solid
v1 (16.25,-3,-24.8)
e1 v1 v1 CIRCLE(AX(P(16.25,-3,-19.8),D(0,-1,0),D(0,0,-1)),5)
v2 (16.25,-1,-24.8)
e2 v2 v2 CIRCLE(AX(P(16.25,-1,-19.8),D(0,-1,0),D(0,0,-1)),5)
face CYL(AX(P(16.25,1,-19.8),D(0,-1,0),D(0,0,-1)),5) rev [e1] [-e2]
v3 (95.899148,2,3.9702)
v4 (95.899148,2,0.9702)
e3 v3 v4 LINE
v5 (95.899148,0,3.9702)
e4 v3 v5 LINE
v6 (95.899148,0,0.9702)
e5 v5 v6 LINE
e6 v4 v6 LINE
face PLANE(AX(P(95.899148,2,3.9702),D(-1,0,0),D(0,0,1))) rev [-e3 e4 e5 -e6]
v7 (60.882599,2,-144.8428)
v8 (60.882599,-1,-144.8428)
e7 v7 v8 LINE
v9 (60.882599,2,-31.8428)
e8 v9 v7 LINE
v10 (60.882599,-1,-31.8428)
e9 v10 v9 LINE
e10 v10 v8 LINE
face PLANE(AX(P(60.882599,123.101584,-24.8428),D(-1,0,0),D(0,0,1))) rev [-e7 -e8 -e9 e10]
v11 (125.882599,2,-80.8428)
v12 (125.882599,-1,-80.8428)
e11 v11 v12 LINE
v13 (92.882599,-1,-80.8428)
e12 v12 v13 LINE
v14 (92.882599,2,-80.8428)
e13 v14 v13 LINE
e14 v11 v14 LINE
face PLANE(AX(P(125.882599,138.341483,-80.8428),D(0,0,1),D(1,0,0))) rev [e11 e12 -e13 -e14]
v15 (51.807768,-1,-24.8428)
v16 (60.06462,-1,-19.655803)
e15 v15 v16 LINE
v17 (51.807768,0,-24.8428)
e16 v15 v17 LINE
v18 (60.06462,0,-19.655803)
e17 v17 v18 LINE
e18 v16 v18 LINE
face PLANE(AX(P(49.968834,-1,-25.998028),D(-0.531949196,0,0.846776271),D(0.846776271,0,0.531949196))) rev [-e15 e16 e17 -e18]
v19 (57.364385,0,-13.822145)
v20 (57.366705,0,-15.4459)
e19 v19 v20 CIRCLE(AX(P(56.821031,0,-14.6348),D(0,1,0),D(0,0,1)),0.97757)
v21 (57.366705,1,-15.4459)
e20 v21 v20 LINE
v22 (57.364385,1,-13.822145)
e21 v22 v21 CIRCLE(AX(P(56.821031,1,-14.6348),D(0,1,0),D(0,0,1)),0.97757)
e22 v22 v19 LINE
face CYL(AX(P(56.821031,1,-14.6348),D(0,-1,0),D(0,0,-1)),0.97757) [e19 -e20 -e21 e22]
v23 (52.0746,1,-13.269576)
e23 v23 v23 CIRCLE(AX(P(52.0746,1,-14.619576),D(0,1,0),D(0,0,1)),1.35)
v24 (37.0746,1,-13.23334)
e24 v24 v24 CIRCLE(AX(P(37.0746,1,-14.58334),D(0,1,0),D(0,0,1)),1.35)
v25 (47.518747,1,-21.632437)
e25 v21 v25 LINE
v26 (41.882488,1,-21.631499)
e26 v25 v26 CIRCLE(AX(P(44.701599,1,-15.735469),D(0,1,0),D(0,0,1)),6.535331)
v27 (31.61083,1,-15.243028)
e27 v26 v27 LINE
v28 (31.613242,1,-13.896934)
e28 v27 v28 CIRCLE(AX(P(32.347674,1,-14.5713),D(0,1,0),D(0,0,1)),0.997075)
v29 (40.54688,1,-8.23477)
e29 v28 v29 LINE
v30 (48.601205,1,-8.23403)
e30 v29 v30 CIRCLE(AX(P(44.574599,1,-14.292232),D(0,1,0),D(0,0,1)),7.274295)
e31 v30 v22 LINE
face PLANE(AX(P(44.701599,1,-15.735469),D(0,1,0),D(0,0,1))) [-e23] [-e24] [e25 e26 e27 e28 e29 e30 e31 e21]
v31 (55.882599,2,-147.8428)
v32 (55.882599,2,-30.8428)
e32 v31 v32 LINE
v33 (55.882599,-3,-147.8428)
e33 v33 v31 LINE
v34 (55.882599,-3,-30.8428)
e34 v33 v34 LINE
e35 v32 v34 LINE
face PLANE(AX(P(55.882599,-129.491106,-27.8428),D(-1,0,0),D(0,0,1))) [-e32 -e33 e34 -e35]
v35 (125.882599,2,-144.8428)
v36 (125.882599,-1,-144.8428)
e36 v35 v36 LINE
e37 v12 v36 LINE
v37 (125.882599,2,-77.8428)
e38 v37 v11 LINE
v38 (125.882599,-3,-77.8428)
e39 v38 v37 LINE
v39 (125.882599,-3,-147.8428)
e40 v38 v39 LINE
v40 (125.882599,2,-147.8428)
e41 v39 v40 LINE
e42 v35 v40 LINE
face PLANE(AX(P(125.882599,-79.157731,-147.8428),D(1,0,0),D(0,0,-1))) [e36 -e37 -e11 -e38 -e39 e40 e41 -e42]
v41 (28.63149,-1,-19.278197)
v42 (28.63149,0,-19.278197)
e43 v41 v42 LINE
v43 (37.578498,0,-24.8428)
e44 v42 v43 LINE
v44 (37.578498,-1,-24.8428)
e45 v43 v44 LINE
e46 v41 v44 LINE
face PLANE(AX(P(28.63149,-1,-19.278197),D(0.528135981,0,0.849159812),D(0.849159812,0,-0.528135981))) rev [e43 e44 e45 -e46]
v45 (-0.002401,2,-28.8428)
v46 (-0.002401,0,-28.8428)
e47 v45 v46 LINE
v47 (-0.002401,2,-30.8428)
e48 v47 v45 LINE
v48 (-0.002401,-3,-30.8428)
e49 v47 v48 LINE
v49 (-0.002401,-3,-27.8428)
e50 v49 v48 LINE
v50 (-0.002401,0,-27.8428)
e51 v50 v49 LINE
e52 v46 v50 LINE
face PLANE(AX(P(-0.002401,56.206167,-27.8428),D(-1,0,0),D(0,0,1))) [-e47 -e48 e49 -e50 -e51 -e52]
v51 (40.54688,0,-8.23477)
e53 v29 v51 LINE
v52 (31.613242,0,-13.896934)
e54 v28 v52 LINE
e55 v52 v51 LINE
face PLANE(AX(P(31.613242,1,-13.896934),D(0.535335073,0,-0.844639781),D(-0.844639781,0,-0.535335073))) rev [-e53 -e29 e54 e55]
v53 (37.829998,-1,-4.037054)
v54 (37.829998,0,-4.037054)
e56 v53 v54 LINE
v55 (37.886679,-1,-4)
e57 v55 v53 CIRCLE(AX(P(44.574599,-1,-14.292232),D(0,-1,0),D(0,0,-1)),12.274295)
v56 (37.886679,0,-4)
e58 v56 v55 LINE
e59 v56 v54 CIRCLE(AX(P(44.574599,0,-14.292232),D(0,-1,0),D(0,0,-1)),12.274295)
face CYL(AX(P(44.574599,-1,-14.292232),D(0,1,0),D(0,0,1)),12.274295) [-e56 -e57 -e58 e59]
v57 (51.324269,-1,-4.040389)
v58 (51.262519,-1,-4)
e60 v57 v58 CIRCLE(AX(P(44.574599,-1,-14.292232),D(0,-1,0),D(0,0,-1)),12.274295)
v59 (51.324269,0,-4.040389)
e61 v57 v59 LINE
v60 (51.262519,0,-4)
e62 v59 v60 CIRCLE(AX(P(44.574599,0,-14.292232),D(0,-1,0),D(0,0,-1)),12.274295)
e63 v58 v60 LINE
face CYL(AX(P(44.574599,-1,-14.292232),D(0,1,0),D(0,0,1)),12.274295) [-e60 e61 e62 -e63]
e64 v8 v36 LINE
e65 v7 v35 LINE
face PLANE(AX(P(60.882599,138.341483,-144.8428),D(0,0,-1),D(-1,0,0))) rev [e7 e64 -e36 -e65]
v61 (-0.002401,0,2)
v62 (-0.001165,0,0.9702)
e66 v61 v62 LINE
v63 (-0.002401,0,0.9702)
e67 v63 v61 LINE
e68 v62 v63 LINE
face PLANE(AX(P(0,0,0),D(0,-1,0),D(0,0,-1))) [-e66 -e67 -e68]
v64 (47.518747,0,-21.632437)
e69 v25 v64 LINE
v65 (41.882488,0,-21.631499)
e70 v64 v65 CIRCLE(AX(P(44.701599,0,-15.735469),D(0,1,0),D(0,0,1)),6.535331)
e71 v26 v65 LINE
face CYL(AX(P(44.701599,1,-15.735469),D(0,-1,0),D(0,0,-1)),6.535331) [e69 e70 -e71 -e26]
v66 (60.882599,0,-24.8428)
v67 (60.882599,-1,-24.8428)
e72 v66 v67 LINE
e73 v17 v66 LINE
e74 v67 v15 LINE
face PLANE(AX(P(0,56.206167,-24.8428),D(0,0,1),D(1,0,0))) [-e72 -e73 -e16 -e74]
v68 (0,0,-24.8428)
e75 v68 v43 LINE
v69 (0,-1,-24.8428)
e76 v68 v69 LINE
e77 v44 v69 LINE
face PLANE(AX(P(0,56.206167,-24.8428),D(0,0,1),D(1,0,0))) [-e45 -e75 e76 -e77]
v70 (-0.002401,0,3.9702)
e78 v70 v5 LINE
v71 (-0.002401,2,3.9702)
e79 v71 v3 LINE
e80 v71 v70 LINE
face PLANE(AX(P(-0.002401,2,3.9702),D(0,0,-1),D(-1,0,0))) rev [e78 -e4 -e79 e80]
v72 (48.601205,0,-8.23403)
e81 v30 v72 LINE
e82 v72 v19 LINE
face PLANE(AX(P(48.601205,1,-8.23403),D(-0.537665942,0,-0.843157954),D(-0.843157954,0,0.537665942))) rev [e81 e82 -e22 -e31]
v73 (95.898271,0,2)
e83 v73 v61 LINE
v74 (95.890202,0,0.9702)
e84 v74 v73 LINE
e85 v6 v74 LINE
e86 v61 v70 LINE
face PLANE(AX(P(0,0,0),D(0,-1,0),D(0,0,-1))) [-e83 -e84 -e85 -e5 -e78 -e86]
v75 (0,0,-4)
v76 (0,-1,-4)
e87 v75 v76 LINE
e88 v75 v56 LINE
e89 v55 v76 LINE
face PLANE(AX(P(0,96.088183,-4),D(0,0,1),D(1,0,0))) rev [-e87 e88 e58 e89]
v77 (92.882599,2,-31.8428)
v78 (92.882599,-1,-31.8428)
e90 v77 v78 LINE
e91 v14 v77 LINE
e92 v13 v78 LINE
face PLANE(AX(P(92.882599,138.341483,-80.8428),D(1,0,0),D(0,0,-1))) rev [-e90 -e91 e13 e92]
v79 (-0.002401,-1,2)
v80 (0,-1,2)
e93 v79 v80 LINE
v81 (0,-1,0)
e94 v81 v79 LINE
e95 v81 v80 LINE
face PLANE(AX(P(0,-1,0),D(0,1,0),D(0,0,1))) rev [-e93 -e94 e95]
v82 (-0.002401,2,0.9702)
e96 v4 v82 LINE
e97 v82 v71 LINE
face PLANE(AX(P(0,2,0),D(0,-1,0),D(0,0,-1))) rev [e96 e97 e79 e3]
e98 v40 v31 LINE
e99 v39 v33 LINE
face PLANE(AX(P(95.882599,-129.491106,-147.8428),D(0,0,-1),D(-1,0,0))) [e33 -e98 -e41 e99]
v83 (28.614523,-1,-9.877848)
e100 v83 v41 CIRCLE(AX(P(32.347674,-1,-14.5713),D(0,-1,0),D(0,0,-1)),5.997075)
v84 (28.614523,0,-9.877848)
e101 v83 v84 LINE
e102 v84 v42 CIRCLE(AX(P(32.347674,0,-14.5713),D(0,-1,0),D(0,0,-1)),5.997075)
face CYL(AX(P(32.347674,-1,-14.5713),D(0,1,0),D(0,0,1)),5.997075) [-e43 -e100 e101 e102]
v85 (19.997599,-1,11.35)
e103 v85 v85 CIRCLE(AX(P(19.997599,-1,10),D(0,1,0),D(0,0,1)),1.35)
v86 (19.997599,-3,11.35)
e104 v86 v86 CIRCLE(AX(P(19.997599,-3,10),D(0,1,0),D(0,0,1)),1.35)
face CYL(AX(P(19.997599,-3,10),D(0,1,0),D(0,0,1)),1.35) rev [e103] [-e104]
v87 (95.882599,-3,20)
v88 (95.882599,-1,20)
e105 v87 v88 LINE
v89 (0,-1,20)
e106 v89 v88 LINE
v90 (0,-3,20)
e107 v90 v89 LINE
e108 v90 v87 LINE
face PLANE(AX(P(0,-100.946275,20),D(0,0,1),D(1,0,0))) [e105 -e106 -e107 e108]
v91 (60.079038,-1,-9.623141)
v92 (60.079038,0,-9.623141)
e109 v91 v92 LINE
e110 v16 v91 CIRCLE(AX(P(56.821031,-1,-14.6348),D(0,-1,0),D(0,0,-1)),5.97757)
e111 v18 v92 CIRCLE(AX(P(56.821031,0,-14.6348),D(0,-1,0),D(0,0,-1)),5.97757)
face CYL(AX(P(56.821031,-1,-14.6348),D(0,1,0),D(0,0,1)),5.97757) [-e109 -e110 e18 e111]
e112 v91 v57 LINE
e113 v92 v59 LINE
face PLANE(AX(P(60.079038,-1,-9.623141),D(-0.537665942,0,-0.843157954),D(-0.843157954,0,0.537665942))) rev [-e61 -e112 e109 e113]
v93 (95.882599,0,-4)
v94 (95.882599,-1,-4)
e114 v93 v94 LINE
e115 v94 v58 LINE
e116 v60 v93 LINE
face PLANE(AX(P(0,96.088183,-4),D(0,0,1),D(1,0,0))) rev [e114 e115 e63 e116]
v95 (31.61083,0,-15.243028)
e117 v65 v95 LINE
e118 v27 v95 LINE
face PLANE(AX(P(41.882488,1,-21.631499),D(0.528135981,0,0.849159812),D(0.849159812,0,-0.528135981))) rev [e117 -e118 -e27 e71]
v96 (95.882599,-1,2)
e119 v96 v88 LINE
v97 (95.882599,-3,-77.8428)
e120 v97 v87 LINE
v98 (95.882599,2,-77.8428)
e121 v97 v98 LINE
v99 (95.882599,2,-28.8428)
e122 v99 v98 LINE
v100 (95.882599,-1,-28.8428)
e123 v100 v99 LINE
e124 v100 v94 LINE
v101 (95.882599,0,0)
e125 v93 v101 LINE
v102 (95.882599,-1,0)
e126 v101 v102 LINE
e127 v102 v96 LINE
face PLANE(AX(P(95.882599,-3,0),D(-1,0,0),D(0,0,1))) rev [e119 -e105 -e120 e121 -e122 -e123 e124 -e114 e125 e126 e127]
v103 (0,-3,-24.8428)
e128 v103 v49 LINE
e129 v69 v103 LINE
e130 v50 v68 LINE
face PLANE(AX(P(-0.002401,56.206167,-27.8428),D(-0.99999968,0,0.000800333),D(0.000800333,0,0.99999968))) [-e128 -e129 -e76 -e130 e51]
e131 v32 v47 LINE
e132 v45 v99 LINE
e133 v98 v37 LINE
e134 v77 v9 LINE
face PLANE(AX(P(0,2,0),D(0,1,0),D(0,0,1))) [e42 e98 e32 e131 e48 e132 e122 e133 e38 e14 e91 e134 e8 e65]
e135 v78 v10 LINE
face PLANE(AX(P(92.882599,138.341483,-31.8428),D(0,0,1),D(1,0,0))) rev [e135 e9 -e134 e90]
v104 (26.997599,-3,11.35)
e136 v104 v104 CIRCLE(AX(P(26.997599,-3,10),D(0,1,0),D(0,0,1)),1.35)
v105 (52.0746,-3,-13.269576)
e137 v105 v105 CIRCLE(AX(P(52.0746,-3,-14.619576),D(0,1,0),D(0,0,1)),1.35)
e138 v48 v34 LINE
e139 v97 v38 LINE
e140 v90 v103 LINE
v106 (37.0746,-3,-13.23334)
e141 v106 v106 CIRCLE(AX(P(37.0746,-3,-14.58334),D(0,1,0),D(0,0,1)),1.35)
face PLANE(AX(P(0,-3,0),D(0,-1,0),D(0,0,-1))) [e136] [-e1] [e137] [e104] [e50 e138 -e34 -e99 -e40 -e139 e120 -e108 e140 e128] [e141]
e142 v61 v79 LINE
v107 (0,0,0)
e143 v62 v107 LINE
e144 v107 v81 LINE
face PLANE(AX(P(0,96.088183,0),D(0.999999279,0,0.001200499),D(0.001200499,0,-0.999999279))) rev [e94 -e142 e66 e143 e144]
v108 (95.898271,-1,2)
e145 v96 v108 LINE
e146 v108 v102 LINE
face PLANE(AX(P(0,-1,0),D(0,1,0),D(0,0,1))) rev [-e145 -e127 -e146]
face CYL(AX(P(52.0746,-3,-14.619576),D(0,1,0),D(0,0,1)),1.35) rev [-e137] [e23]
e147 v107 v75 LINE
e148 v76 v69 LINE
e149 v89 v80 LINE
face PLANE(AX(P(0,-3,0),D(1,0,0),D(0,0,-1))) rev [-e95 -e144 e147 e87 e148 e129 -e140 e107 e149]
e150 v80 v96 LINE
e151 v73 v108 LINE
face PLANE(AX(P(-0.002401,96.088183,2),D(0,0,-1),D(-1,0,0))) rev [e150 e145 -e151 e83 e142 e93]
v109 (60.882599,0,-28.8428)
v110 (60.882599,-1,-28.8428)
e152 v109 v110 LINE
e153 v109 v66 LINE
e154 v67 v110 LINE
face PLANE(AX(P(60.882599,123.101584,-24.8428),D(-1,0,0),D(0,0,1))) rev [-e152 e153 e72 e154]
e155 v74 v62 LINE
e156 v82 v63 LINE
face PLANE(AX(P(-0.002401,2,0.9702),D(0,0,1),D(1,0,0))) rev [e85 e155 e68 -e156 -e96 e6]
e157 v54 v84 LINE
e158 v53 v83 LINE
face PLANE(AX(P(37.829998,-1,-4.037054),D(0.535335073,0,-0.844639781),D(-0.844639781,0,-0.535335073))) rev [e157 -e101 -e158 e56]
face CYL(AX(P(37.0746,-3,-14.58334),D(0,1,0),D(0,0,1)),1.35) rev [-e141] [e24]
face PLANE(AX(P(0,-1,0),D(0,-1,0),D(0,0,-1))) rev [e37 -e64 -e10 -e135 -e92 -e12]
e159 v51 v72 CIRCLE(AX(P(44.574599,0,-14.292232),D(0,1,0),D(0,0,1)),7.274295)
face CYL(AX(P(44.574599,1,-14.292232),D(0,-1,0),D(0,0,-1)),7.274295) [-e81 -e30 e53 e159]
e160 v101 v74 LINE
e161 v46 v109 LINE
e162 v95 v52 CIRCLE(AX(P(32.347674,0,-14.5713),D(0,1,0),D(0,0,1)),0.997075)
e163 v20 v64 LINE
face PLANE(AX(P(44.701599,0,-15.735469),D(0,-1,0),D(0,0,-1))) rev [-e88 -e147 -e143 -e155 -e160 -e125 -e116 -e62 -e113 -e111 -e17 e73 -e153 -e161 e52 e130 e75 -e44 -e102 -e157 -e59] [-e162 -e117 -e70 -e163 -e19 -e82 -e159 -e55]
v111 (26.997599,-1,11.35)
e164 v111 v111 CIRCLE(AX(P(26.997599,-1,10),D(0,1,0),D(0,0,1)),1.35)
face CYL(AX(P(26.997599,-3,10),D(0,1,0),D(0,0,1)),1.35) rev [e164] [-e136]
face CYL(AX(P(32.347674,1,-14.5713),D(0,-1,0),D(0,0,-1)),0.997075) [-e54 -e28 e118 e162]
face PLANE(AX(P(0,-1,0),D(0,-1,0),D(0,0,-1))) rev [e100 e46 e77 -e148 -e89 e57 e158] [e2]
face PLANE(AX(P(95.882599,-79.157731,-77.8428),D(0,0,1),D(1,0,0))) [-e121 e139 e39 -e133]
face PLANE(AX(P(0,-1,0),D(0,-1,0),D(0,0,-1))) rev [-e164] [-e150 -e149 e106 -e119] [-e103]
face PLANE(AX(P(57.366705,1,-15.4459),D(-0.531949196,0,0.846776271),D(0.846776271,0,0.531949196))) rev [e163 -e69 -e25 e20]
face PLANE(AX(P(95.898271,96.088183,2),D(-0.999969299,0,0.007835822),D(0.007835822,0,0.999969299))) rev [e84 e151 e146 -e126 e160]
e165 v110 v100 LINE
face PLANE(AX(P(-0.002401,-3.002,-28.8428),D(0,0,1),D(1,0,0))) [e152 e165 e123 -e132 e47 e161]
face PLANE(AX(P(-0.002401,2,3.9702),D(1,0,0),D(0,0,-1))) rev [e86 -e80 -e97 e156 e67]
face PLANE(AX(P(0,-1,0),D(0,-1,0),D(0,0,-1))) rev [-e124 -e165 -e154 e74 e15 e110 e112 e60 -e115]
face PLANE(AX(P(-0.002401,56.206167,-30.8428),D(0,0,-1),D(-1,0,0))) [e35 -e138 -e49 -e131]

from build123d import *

# Parameters (mm, degrees)
EXTRUDE_1_DEPTH          = 1
EXTRUDE_2_DEPTH          = 1
SKETCH_5_W               = 95.882599
SKETCH_5_H               = 27.8428
EXTRUDE_3_DEPTH          = 2
CUT_EXTRUDE_1_DEPTH      = 100.923442209
CUT_EXTRUDE_1_DEPTH_BACK = 100.923442209
SKETCH_6_R               = 5
CUT_EXTRUDE_2_DEPTH      = 100.923442209
CUT_EXTRUDE_2_DEPTH_BACK = 100.923442209
SKETCH_7_R               = 1.35
SKETCH_8_W               = 95.882599
SKETCH_8_H               = 20
EXTRUDE_4_DEPTH          = 2
EXTRUDE_5_DEPTH          = 1
SKETCH_10_W              = 40
SKETCH_10_H              = 120
EXTRUDE_6_DEPTH          = 2
EXTRUDE_START            = -3
EXTRUDE_7_DEPTH          = 3
SKETCH_12_W              = 5
SKETCH_12_H              = 123
EXTRUDE_8_DEPTH          = 1
EXTRUDE_9_OUTLINE_W      = 95.901549254
EXTRUDE_9_OUTLINE_H      = 3
EXTRUDE_9_OUTLINE_W_2    = 95.885
EXTRUDE_9_OUTLINE_H_2    = 2
EXTRUDE_9_DEPTH          = 2
EXTRUDE_START_2          = -1
EXTRUDE_9_2_OUTLINE_W    = 95.885
EXTRUDE_9_2_OUTLINE_H    = 2
EXTRUDE_9_2_DEPTH        = 1
CUT_EXTRUDE_3_DEPTH      = 177.247383378
CUT_EXTRUDE_3_DEPTH_BACK = 177.247383378
SKETCH_16_R              = 1.35
SKETCH_17_W              = 30
SKETCH_17_H              = 70
EXTRUDE_10_DEPTH         = 2
EXTRUDE_11_DEPTH         = 3


# Read off the part's stored shape, not the designer's step: 凸台-拉伸9
with BuildPart() as part:
    # 草图3 → 凸台-拉伸1 (new body)
    with BuildSketch(Plane(origin=(0, 0, 0), x_dir=(1, 0, 0), z_dir=(0, 1, 0))):
        with BuildLine():
            Line((41.882488294, 21.631498957), (31.610829647, 15.243028334))
            ThreePointArc((31.610829647, 15.243028334), (31.350600602, 14.569512784), (31.613242469, 13.896934459))
            Line((31.613242469, 13.896934459), (40.546880152, 8.234769731))
            ThreePointArc((40.546880152, 8.234769731), (44.573930655, 7.017936995), (48.601204689, 8.234029718))
            Line((48.601204689, 8.234029718), (57.364385058, 13.822144736))
            ThreePointArc((57.364385058, 13.822144736), (57.798599734, 14.63340346), (57.366705056, 15.44589967))
            Line((57.366705056, 15.44589967), (47.51874726, 21.632437259))
            ThreePointArc((47.51874726, 21.632437259), (44.700511427, 22.270800367), (41.882488294, 21.631498957))
        make_face()
    extrude(amount=EXTRUDE_1_DEPTH)

    # 草图4 → 凸台-拉伸2 (add)
    with BuildSketch(Plane.XZ):
        with BuildLine():
            Line((49.96883361, -25.998027869), (60.064619869, -19.655803167))
            ThreePointArc((60.064619869, -19.655803167), (62.798594558, -14.643390815), (60.079038247, -9.623140954))
            Line((60.079038247, -9.623140954), (51.324268762, -4.040389399))
            ThreePointArc((51.324268762, -4.040389399), (44.577632655, -2.01793734), (37.829997654, -4.03705422))
            Line((37.829997654, -4.03705422), (28.614522584, -9.877848279))
            ThreePointArc((28.614522584, -9.877848279), (26.350608769, -14.582124379), (28.631489707, -19.27819737))
            Line((28.631489707, -19.27819737), (39.443234024, -26.002574933))
            ThreePointArc((39.443234024, -26.002574933), (44.706582673, -27.270799381), (49.96883361, -25.998027869))
        make_face()
    extrude(amount=EXTRUDE_2_DEPTH)

    # 草图5 → 凸台-拉伸3 (add)
    with BuildSketch(Plane.XZ.offset(1)):
        with Locations((47.9412995, -13.9214)):
            Rectangle(SKETCH_5_W, SKETCH_5_H)
    extrude(amount=EXTRUDE_3_DEPTH)

    # 草图6 → 切除-拉伸1 (cut, two sides: drawn at the far end of the back side and taken through both)
    with BuildSketch(Plane.XZ.offset(3).offset(-CUT_EXTRUDE_1_DEPTH_BACK)):
        with Locations(Location((16.25, -19.8, 0), (0, 0, 270))):
            Circle(SKETCH_6_R)
    extrude(amount=CUT_EXTRUDE_1_DEPTH + CUT_EXTRUDE_1_DEPTH_BACK, mode=Mode.SUBTRACT)

    # 草图7 → 切除-拉伸2 (cut, two sides: drawn at the far end of the back side and taken through both)
    with BuildSketch(Plane(origin=(0, 1, 0), x_dir=(1, 0, 0), z_dir=(0, 1, 0)).offset(-CUT_EXTRUDE_2_DEPTH_BACK)):
        with Locations(Location((37.074600168, 14.583340303, 0), (0, 0, 270))):
            Circle(SKETCH_7_R)
        with Locations(Location((52.074600168, 14.619575942, 0), (0, 0, 270))):
            Circle(SKETCH_7_R)
    extrude(amount=CUT_EXTRUDE_2_DEPTH + CUT_EXTRUDE_2_DEPTH_BACK, mode=Mode.SUBTRACT)

    # 草图8 → 凸台-拉伸4 (add)
    with BuildSketch(Plane(origin=(0, -1, 0), x_dir=(1, 0, 0), z_dir=(0, 1, 0))):
        with Locations((47.9412995, -10)):
            Rectangle(SKETCH_8_W, SKETCH_8_H)
    extrude(amount=-EXTRUDE_4_DEPTH)

    # 草图9 → 凸台-拉伸5 (add)
    with BuildSketch(Plane(origin=(0, -1, 0), x_dir=(1, 0, 0), z_dir=(0, 1, 0))):
        Polygon((0, 0), (0, 4), (95.882599, 4), (95.882599, 0), (95.898271126, -2), (-0.002401, -2), align=None)
    extrude(amount=EXTRUDE_5_DEPTH)

    # 草图10 → 凸台-拉伸6 (add)
    with BuildSketch(Plane(origin=(0, -1, 0), x_dir=(1, 0, 0), z_dir=(0, 1, 0))):
        with Locations((75.882599, 87.8428)):
            Rectangle(SKETCH_10_W, SKETCH_10_H)
    extrude(amount=-EXTRUDE_6_DEPTH)

    # 草图11 → 凸台-拉伸7 (add)
    with BuildSketch(Plane.XZ.offset(3).offset(EXTRUDE_START)):
        Polygon((-0.002401, -27.8428), (-0.002401, -30.8428), (55.882599, -30.8428), (55.882599, -27.8428), (55.882599, -24.8428), (0, -24.8428), align=None)
    extrude(amount=EXTRUDE_7_DEPTH)

    # 草图12 → 凸台-拉伸8 (add)
    with BuildSketch(Plane(origin=(0, -1, 0), x_dir=(1, 0, 0), z_dir=(0, 1, 0))):
        with Locations((58.382599, 86.3428)):
            Rectangle(SKETCH_12_W, SKETCH_12_H)
    extrude(amount=EXTRUDE_8_DEPTH)

    # 凸台-拉伸9 outline → 凸台-拉伸9 (add)
    with BuildSketch(Plane(origin=(0, 0, 0), x_dir=(1, 0, 0), z_dir=(0, 1, 0))):
        with Locations((47.948373627, -2.4702)):
            Rectangle(EXTRUDE_9_OUTLINE_W, EXTRUDE_9_OUTLINE_H)
        with Locations((47.940099, 29.8428)):
            Rectangle(EXTRUDE_9_OUTLINE_W_2, EXTRUDE_9_OUTLINE_H_2)
    extrude(amount=EXTRUDE_9_DEPTH)

    # Extrude 9 2 outline → Extrude 9 2 (add)
    with BuildSketch(Plane(origin=(0, 0, 0), x_dir=(1, 0, 0), z_dir=(0, 1, 0)).offset(EXTRUDE_START_2)):
        with Locations((47.940099, 29.8428)):
            Rectangle(EXTRUDE_9_2_OUTLINE_W, EXTRUDE_9_2_OUTLINE_H)
    extrude(amount=EXTRUDE_9_2_DEPTH)

    # 草图16 → 切除-拉伸3 (cut, two sides: drawn at the far end of the back side and taken through both)
    with BuildSketch(Plane(origin=(0, -1, 0), x_dir=(1, 0, 0), z_dir=(0, 1, 0)).offset(-CUT_EXTRUDE_3_DEPTH_BACK)):
        with Locations(Location((19.997599, -10, 0), (0, 0, 270))):
            Circle(SKETCH_16_R)
        with Locations(Location((26.997599, -10, 0), (0, 0, 270))):
            Circle(SKETCH_16_R)
    extrude(amount=CUT_EXTRUDE_3_DEPTH + CUT_EXTRUDE_3_DEPTH_BACK, mode=Mode.SUBTRACT)

    # 草图17 → 凸台-拉伸10 (add)
    with BuildSketch(Plane(origin=(0, -1, 0), x_dir=(1, 0, 0), z_dir=(0, 1, 0))):
        with Locations((110.882599, 112.8428)):
            Rectangle(SKETCH_17_W, SKETCH_17_H)
    extrude(amount=-EXTRUDE_10_DEPTH)

    # 草图18 → 凸台-拉伸11 (add)
    with BuildSketch(Plane(origin=(0, -1, 0), x_dir=(1, 0, 0), z_dir=(0, 1, 0))):
        Polygon((95.882599, 30.8428), (95.882599, 77.8428), (125.882599, 77.8428), (125.882599, 80.8428), (92.882599, 80.8428), (92.882599, 31.8428), (60.882599, 31.8428), (60.882599, 144.8428), (125.882599, 144.8428), (125.882599, 147.8428), (55.882599, 147.8428), (55.882599, 30.8428), (60.882599, 30.8428), align=None)
    extrude(amount=EXTRUDE_11_DEPTH)


solid = part.part
